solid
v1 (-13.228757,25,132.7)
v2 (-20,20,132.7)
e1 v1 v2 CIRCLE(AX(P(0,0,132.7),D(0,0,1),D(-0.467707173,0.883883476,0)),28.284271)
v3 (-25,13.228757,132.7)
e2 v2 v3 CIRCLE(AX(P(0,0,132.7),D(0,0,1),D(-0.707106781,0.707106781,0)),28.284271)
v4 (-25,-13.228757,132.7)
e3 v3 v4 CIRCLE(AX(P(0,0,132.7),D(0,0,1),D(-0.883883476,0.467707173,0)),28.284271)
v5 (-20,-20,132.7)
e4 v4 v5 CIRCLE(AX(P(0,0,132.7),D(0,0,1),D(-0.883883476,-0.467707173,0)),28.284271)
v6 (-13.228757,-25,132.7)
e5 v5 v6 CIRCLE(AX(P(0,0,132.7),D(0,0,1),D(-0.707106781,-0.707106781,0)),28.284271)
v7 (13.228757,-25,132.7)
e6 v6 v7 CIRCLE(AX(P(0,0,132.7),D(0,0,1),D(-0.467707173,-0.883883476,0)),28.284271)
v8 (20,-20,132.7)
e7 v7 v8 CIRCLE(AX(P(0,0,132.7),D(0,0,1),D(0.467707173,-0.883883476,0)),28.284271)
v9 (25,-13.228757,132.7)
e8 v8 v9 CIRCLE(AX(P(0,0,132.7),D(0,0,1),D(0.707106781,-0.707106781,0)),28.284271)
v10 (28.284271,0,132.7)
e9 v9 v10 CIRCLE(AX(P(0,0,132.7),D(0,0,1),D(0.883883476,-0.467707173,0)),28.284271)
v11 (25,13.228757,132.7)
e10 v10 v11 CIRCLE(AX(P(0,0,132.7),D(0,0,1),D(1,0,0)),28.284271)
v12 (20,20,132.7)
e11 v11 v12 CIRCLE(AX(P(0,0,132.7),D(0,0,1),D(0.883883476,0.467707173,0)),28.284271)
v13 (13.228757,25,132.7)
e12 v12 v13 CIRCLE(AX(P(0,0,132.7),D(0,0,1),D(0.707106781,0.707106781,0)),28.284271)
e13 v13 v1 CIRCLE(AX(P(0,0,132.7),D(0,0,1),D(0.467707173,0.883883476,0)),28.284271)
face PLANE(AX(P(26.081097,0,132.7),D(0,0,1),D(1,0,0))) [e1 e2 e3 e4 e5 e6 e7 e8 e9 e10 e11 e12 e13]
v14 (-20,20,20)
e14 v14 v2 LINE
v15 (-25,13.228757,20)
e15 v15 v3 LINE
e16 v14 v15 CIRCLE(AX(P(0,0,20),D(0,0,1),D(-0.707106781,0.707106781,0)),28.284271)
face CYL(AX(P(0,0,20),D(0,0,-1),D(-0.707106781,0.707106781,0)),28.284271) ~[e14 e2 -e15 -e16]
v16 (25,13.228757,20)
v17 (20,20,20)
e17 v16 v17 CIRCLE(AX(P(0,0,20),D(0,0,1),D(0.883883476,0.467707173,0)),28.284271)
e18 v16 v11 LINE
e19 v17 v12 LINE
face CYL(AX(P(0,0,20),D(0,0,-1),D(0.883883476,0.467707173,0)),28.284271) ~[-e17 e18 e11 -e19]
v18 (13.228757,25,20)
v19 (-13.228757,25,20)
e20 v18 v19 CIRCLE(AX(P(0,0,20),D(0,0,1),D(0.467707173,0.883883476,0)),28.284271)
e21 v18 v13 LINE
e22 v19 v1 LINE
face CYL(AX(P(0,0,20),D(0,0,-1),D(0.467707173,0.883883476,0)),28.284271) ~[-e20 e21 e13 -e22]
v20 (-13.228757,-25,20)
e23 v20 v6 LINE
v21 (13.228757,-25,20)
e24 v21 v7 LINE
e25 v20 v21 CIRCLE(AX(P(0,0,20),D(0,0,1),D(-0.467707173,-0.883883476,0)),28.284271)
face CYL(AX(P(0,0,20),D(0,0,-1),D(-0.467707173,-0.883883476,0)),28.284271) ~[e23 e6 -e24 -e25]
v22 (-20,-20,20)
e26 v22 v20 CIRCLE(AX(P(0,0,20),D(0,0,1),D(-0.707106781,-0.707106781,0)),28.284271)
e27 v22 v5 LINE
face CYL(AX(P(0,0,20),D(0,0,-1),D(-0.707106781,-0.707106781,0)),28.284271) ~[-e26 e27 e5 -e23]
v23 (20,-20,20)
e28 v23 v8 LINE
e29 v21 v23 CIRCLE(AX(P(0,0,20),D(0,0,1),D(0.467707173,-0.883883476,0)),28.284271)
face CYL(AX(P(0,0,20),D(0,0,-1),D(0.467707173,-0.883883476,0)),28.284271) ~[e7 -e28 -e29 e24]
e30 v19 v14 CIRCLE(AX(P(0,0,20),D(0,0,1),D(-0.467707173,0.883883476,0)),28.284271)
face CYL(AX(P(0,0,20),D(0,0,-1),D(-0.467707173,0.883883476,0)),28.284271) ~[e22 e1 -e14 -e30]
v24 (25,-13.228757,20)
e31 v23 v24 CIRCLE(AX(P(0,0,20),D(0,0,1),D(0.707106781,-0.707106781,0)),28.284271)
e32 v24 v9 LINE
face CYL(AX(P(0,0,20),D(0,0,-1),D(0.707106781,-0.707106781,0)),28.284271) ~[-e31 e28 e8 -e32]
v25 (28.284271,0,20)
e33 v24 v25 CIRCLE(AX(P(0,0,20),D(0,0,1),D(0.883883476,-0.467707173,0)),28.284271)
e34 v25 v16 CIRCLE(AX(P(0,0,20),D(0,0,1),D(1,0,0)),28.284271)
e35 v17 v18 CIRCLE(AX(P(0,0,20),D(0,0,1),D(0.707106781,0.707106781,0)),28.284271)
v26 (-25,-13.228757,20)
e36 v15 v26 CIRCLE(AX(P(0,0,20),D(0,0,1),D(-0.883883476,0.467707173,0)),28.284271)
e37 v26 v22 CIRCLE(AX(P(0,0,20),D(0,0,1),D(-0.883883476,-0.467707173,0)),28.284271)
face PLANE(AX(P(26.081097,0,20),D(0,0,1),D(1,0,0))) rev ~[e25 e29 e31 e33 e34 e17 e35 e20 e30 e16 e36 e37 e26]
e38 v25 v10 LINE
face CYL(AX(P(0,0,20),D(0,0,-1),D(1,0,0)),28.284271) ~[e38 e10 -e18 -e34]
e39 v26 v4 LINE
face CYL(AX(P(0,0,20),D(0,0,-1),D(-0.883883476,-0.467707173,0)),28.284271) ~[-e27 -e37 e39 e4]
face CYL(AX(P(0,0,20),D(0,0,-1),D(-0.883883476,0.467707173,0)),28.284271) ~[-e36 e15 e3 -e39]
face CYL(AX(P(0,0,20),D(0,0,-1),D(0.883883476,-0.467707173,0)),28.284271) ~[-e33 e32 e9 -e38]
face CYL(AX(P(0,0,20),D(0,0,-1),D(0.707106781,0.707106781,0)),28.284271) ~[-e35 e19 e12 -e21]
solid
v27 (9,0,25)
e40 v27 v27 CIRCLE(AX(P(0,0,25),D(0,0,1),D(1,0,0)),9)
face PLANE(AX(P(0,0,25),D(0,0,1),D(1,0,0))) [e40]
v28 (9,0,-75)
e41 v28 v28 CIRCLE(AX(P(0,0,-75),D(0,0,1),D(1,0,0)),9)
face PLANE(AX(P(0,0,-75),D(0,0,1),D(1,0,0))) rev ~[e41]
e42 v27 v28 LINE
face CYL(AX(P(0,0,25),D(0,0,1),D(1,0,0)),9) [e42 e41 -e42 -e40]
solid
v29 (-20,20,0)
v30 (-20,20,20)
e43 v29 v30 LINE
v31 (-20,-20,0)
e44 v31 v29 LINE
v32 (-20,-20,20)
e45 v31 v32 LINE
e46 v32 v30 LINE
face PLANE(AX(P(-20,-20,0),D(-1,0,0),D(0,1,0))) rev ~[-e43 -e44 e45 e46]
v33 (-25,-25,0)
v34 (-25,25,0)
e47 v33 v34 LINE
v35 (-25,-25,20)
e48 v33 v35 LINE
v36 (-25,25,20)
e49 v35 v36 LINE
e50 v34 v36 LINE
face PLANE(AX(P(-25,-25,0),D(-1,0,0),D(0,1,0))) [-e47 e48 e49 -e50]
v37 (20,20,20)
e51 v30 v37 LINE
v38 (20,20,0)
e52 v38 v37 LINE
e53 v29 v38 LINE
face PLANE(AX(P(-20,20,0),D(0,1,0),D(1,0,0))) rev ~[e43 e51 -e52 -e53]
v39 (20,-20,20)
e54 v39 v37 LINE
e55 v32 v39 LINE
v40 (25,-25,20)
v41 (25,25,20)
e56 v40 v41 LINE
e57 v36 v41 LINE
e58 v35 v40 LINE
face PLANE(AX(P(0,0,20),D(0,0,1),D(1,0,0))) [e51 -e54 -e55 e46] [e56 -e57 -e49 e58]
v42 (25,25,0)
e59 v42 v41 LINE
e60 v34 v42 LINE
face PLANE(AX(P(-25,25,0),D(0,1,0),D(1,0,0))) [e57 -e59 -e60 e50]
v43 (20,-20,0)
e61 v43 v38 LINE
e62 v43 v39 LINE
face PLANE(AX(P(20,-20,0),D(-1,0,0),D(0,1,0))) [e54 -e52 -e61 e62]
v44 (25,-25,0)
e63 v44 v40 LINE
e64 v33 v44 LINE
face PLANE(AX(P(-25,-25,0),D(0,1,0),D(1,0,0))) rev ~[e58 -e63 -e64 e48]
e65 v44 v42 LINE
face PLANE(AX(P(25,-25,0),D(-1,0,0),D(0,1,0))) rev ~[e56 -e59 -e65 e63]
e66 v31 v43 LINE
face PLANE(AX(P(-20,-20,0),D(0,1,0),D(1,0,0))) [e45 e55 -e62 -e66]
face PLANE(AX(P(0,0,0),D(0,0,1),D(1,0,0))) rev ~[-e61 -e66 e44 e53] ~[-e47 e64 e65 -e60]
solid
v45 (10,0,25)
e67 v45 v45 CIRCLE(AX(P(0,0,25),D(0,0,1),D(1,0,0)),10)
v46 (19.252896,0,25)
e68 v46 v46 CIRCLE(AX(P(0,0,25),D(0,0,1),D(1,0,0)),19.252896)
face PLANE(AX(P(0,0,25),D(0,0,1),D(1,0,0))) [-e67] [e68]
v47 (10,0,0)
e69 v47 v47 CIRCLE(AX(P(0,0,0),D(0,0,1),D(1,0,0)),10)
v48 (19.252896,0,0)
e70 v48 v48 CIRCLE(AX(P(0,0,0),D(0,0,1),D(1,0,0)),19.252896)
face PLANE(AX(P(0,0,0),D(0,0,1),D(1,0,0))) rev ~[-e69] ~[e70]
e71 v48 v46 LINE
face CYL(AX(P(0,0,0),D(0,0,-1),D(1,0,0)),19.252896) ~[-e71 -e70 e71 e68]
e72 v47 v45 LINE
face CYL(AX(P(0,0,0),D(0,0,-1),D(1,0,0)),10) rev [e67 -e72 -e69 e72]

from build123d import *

# Parameters (mm, degrees)
F0_R     = 19.2528959131
F0_R_2   = 10
F1_DEPTH = 25
F0_W     = 50
F0_H     = 50
F0_W_2   = 40
F0_H_2   = 40
F2_DEPTH = 20
F3_R     = 9
F4_DEPTH = 100
F5_W     = 40
F5_H     = 40
F6_DEPTH = 112.7


with BuildPart() as f1:
    # F0 (on Top) → F1 (new body)
    with BuildSketch(Plane.XY):
        Circle(F0_R)
        Circle(F0_R_2, mode=Mode.SUBTRACT)
    extrude(amount=F1_DEPTH)


with BuildPart() as f2:
    # F0 (on Top) → F2 (new body)
    with BuildSketch(Plane.XY):
        Rectangle(F0_W, F0_H)
        Rectangle(F0_W_2, F0_H_2, mode=Mode.SUBTRACT)
    extrude(amount=F2_DEPTH)


with BuildPart() as f4:
    # F3 (on face) → F4 (new body)
    with BuildSketch(Plane.XY.offset(25)):
        Circle(F3_R)
    extrude(amount=-F4_DEPTH)


with BuildPart() as f6:
    # F5 (on face) → F6 (new body)
    with BuildSketch(Plane.XY.offset(20)):
        with BuildLine():
            ThreePointArc((25, -13.2287565553), (27.4509269533, -6.8151749359), (28.2842712475, 0))
            ThreePointArc((28.2842712475, 0), (27.4509269533, 6.8151749359), (25, 13.2287565553))
            Line((25, 13.2287565553), (25, -13.2287565553))
        make_face()
        with BuildLine():
            Line((25, -13.2287565553), (25, 13.2287565553))
            ThreePointArc((25, 13.2287565553), (22.7532950239, 16.8014155818), (20, 20))
            Line((20, 20), (20, -20))
            ThreePointArc((20, -20), (22.7532950239, -16.8014155818), (25, -13.2287565553))
        make_face()
        with BuildLine():
            Line((-20, 20), (20, 20))
            ThreePointArc((20, 20), (16.8014155818, 22.7532950239), (13.2287565553, 25))
            Line((13.2287565553, 25), (-13.2287565553, 25))
            ThreePointArc((-13.2287565553, 25), (-16.8014155818, 22.7532950239), (-20, 20))
        make_face()
        Rectangle(F5_W, F5_H)
        with BuildLine():
            ThreePointArc((13.2287565553, -25), (16.8014155818, -22.7532950239), (20, -20))
            Line((20, -20), (-20, -20))
            ThreePointArc((-20, -20), (-16.8014155818, -22.7532950239), (-13.2287565553, -25))
            Line((-13.2287565553, -25), (13.2287565553, -25))
        make_face()
        with BuildLine():
            Line((-13.2287565553, 25), (13.2287565553, 25))
            ThreePointArc((13.2287565553, 25), (0, 28.2842712475), (-13.2287565553, 25))
        make_face()
        with BuildLine():
            Line((-20, -20), (-20, 20))
            ThreePointArc((-20, 20), (-22.7532950239, 16.8014155818), (-25, 13.2287565553))
            Line((-25, 13.2287565553), (-25, -13.2287565553))
            ThreePointArc((-25, -13.2287565553), (-22.7532950239, -16.8014155818), (-20, -20))
        make_face()
        with BuildLine():
            ThreePointArc((-13.2287565553, -25), (0, -28.2842712475), (13.2287565553, -25))
            Line((13.2287565553, -25), (-13.2287565553, -25))
        make_face()
        with BuildLine():
            Line((-25, -13.2287565553), (-25, 13.2287565553))
            ThreePointArc((-25, 13.2287565553), (-28.2842712475, 0), (-25, -13.2287565553))
        make_face()
    extrude(amount=F6_DEPTH)


solid = Compound([f1.part, f2.part, f4.part, f6.part])
